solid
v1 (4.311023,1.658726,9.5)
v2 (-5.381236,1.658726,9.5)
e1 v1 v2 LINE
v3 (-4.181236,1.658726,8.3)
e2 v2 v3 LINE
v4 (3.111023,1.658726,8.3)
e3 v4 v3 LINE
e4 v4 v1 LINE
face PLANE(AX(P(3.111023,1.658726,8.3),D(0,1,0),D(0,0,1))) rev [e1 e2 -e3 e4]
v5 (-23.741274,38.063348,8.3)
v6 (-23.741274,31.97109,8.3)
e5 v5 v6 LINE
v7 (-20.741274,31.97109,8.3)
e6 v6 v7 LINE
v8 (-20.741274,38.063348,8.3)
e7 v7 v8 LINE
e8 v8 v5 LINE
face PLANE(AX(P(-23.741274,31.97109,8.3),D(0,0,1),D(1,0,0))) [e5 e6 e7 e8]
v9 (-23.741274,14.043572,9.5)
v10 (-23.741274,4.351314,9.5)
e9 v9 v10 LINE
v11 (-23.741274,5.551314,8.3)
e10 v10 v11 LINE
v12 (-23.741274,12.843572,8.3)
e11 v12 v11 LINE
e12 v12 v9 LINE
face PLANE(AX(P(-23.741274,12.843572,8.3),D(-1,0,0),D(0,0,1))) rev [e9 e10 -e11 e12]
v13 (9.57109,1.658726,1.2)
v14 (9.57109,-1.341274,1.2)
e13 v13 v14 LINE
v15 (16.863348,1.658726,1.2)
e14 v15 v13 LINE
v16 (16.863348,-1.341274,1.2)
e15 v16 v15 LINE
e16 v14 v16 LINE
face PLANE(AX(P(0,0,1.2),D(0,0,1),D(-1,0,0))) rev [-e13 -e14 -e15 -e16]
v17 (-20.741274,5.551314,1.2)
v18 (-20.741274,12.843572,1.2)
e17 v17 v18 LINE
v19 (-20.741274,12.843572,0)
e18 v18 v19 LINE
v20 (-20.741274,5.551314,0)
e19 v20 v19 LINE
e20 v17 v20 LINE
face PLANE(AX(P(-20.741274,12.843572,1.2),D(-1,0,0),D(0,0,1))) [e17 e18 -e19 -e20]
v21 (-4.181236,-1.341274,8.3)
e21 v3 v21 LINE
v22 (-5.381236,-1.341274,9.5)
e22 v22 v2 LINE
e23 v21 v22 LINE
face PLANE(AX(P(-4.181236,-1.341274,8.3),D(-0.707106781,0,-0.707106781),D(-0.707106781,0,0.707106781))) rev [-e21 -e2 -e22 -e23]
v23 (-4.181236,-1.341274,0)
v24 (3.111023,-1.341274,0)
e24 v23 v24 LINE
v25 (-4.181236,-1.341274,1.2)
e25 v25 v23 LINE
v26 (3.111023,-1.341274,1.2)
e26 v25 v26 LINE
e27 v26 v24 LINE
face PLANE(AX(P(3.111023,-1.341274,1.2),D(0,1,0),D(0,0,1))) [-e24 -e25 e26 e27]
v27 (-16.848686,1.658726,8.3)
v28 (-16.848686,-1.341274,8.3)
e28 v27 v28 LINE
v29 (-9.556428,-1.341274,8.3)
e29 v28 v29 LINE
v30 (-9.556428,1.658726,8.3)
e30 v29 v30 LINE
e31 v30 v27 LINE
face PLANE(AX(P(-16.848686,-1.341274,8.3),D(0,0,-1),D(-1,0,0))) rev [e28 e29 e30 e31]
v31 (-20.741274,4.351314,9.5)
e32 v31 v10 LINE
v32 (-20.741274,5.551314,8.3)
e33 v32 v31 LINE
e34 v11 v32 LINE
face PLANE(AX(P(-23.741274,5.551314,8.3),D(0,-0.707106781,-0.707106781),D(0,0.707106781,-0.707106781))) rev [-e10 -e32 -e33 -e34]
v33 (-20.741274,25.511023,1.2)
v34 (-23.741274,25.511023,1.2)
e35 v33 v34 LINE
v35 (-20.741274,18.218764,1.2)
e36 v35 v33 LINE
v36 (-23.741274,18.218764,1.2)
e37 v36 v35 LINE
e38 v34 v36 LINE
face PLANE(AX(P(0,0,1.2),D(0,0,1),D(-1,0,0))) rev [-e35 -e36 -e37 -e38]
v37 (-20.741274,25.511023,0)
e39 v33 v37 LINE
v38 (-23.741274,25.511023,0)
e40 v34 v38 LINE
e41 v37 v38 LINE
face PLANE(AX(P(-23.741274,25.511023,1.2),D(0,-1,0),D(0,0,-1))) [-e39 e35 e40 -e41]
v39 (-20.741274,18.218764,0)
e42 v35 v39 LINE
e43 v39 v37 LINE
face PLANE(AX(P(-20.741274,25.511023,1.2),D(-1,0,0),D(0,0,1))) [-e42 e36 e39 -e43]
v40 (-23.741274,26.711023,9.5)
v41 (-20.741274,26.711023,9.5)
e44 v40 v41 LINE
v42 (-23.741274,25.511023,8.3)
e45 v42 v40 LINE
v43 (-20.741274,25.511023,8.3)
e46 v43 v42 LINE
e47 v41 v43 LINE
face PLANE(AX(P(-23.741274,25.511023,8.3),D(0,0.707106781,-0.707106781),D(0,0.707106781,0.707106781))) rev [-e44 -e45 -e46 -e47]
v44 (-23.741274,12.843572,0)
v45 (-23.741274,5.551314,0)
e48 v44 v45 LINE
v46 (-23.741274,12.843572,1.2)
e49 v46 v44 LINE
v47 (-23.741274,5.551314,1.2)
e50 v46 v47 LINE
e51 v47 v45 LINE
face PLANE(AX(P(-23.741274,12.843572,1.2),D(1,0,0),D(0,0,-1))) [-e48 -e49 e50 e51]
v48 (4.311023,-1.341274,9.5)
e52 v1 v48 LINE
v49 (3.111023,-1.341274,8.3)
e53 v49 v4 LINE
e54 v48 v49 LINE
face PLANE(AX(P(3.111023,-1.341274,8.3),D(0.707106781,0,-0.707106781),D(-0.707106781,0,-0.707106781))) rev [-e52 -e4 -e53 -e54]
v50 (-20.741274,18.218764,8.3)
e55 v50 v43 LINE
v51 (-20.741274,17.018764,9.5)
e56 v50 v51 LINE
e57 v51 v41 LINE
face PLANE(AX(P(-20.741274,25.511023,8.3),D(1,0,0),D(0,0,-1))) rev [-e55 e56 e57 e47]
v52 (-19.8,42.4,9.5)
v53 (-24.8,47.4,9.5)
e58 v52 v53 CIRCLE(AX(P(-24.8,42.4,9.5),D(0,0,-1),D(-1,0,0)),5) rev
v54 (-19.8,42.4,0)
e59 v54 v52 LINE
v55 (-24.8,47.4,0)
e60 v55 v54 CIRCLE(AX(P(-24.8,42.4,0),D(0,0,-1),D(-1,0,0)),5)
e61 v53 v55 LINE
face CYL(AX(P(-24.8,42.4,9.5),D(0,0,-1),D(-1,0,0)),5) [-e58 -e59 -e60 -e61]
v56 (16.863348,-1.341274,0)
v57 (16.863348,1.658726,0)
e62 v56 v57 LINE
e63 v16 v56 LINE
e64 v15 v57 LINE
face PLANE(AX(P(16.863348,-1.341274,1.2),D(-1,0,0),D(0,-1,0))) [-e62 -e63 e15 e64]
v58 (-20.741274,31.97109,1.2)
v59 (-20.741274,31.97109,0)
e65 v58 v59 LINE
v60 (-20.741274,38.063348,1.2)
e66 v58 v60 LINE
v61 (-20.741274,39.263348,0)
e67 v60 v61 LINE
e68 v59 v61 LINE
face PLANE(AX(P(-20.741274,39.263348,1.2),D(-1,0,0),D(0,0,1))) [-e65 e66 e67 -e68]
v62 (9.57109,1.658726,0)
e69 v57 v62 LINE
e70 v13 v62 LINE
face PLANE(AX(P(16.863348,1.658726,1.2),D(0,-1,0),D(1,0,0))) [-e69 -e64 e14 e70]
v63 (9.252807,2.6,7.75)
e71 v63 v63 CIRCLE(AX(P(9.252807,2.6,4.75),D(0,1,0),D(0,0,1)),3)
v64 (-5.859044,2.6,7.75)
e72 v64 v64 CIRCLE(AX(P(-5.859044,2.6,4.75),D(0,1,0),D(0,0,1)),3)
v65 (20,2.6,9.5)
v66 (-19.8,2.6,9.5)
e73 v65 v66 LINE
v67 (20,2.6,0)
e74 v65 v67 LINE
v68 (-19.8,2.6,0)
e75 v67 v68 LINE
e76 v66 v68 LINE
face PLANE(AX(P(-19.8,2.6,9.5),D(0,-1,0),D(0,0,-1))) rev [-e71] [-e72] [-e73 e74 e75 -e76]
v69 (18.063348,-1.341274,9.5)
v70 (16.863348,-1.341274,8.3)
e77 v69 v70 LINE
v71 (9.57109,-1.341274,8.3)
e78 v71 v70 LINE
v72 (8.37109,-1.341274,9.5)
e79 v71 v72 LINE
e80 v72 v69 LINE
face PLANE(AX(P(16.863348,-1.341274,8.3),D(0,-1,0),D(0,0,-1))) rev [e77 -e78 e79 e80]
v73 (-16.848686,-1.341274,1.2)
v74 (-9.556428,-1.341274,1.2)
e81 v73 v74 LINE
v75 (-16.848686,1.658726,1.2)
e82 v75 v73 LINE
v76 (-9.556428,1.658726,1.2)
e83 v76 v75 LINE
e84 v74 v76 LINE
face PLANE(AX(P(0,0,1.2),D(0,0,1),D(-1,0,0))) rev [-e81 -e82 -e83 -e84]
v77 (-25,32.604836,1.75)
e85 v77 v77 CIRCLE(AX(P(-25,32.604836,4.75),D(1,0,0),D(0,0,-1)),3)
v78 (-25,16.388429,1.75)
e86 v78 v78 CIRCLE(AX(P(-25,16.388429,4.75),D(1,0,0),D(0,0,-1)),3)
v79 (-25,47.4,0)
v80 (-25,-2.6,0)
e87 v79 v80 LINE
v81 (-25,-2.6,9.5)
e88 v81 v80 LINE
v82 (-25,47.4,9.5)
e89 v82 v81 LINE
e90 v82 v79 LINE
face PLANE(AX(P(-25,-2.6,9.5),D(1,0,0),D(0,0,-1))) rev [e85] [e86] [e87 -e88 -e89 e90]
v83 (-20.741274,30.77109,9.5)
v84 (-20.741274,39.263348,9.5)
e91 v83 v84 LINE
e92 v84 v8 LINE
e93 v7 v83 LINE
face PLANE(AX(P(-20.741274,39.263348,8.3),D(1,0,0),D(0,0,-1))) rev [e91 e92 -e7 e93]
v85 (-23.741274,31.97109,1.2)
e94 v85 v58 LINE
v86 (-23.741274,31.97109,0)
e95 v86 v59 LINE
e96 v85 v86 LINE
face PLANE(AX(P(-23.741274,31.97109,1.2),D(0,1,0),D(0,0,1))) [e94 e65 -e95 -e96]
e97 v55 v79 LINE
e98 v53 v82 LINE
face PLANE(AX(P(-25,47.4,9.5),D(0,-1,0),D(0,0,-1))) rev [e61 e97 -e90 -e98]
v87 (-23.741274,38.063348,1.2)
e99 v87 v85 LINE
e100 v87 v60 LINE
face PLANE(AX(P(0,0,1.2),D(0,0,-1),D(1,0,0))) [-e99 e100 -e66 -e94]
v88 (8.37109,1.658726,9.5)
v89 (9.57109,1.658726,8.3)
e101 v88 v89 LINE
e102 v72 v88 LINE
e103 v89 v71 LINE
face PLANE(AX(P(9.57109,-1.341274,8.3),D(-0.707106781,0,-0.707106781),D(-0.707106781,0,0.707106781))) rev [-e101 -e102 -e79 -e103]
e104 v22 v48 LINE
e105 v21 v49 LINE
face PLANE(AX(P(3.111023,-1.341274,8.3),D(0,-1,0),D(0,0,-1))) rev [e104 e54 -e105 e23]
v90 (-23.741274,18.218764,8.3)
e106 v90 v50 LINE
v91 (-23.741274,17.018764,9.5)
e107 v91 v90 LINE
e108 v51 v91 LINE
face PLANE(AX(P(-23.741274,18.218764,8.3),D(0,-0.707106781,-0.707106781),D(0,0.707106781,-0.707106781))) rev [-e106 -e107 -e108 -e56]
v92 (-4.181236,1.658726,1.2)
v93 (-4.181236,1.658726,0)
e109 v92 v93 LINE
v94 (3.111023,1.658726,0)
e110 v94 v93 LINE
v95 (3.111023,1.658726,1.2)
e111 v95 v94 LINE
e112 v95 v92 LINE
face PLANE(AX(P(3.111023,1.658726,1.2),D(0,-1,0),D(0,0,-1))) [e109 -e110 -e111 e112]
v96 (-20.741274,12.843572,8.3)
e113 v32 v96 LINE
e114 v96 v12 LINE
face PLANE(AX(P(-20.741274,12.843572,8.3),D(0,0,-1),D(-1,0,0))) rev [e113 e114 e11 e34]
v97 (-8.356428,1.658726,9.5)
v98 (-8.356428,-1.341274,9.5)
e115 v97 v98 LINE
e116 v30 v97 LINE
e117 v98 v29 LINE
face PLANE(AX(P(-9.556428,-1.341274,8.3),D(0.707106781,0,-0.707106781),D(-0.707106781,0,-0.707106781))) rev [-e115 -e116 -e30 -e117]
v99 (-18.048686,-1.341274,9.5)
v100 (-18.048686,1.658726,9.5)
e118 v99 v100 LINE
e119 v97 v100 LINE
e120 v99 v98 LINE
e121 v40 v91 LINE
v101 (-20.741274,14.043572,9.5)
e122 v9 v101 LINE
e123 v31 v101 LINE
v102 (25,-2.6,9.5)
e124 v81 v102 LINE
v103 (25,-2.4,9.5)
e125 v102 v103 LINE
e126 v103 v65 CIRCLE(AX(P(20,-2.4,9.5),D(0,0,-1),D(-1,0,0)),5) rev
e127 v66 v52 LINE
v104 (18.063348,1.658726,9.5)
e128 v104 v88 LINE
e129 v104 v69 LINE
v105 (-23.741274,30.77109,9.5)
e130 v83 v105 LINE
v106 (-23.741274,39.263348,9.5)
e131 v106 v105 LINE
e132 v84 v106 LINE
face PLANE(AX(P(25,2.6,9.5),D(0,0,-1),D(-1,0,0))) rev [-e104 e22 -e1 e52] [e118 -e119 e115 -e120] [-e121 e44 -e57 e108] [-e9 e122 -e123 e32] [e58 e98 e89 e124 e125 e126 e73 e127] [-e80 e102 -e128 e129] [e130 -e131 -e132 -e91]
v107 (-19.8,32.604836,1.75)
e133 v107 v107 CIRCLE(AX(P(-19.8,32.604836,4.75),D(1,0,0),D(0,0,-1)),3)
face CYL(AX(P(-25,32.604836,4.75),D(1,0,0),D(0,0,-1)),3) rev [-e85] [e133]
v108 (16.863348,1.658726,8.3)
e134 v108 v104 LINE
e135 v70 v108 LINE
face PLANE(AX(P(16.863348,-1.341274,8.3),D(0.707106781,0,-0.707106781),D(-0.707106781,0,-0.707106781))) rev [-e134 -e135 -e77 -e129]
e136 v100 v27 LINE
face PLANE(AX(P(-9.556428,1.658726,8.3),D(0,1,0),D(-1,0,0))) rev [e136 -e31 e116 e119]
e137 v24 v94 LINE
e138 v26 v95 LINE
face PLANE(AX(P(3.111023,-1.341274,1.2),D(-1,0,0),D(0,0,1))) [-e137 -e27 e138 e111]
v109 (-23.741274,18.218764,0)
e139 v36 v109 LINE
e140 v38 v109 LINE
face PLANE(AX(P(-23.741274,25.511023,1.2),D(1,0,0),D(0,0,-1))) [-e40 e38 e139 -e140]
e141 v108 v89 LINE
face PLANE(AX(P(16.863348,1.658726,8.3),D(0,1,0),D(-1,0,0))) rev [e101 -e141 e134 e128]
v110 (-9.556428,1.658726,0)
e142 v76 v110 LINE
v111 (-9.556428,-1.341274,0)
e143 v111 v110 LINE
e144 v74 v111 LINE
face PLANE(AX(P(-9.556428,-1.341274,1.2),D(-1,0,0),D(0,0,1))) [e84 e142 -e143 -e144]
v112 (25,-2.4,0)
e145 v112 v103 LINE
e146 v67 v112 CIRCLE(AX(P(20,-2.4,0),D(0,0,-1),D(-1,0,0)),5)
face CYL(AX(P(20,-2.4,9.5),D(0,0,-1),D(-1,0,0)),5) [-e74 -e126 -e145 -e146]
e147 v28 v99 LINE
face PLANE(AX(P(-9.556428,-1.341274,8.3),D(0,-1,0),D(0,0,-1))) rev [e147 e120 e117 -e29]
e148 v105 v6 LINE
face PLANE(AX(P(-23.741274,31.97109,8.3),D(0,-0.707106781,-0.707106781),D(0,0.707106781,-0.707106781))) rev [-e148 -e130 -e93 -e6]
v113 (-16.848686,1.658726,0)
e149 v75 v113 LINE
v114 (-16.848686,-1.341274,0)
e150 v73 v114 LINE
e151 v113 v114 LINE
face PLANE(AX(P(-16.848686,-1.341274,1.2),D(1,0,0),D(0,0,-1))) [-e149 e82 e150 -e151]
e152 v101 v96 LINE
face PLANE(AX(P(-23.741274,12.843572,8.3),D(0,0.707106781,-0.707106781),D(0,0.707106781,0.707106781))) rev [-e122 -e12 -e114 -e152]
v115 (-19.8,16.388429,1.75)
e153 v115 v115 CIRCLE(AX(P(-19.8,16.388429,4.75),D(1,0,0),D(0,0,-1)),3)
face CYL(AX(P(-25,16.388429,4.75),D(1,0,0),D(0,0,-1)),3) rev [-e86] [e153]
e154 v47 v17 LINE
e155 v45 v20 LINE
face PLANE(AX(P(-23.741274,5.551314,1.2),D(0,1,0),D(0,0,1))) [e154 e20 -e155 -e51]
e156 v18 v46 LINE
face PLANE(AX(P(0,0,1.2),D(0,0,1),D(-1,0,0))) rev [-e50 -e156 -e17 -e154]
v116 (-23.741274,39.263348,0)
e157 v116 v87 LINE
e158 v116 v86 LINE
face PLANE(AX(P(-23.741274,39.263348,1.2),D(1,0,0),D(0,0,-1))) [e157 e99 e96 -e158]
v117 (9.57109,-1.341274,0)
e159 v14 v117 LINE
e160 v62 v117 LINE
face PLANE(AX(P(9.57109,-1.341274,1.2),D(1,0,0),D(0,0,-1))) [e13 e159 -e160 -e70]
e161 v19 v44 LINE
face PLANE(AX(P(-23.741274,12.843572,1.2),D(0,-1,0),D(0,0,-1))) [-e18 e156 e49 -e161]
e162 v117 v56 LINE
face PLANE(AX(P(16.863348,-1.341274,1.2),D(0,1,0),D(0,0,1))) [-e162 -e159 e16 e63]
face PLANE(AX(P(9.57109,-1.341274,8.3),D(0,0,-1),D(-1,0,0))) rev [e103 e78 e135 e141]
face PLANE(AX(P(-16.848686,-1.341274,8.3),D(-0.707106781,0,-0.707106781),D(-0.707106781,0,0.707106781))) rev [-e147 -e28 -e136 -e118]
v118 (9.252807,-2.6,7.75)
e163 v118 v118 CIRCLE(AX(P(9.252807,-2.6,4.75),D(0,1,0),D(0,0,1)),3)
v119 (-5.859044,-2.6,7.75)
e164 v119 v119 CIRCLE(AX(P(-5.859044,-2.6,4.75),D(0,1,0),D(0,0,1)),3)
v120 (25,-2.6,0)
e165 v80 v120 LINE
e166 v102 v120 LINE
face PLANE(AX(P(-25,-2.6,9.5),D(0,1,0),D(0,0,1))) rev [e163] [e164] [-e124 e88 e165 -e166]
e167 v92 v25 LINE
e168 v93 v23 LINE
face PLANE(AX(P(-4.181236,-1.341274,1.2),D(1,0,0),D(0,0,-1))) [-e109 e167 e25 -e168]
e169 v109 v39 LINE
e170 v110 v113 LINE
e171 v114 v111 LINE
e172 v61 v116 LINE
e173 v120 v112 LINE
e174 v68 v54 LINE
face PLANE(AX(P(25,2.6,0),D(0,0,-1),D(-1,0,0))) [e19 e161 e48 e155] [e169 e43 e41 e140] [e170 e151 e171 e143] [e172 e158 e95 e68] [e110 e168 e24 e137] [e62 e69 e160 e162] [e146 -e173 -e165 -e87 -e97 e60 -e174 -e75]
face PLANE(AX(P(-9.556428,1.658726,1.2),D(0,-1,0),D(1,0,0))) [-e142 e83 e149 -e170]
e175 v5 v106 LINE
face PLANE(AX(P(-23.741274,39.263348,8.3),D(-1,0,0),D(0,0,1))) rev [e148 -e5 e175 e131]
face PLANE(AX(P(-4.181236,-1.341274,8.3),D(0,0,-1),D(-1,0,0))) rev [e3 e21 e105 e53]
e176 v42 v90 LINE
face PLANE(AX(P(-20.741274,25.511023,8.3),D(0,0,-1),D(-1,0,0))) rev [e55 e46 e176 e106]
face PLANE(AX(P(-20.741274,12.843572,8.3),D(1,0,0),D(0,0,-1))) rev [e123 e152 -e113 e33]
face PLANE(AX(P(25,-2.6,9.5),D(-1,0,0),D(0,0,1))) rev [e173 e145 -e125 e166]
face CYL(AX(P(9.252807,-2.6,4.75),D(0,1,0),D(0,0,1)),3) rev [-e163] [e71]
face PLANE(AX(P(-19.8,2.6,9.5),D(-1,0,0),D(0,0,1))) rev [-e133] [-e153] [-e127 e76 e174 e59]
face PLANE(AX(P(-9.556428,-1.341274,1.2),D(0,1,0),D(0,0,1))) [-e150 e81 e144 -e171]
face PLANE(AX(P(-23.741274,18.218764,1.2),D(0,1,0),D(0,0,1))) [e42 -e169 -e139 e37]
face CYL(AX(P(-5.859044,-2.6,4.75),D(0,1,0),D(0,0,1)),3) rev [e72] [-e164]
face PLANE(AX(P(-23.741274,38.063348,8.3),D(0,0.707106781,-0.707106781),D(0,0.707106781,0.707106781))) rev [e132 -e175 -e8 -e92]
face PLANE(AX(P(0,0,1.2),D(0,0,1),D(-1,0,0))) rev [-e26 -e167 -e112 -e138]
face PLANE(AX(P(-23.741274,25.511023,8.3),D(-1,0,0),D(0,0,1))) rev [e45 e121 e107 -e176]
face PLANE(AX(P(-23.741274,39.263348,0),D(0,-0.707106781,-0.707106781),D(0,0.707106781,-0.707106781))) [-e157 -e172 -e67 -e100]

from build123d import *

# Parameters (mm, degrees)
EXTRUDE_1_DEPTH      = 9.5
SKETCH_2_R           = 3
CUT_EXTRUDE_1_DEPTH  = 66.909407523
SKETCH_4_R           = 3
CUT_EXTRUDE_2_DEPTH  = 53.175568995
FILLET_1_R           = 5
SKETCH_5_W           = 3
SKETCH_5_H           = 7.292258694
SKETCH_5_H_2         = 7.292258695
SKETCH_5_W_2         = 7.292258695
SKETCH_5_H_3         = 3
SKETCH_5_W_3         = 7.292258694
CUT_EXTRUDE_3_DEPTH  = 1.2
CHAMFER_1_SIZE       = 1.2
CHAMFER_2_SIZE       = 1.2
MIRROR_START         = -23.741274046
MIRROR_1_OUTLINE_W   = 7.292258694
MIRROR_1_OUTLINE_H   = 1.2
MIRROR_1_OUTLINE_W_2 = 7.292258695
MIRROR_1_DEPTH       = 3
MIRROR_START_2       = -16.84868645
MIRROR_1_2_OUTLINE_W = 3
MIRROR_1_2_OUTLINE_H = 1.2
MIRROR_1_2_DEPTH     = 7.292258695
MIRROR_START_3       = -4.181235969
MIRROR_1_3_OUTLINE_W = 3
MIRROR_1_3_OUTLINE_H = 1.2
MIRROR_1_3_DEPTH     = 7.292258694
MIRROR_START_4       = 9.571089537
MIRROR_1_4_OUTLINE_W = 3
MIRROR_1_4_OUTLINE_H = 1.2
MIRROR_1_4_DEPTH     = 7.292258694


# Read off the part's stored shape, not the designer's step: 镜向1
with BuildPart() as part:
    # 草图1 → 凸台-拉伸1 (new body)
    with BuildSketch(Plane.XY):
        Polygon((-19.8, 2.6), (-19.8, 47.4), (-25, 47.4), (-25, -2.6), (25, -2.6), (25, 2.6), align=None)
    extrude(amount=EXTRUDE_1_DEPTH)

    # 草图2 → 切除-拉伸1 (cut, through all)
    with BuildSketch(Plane(origin=(-19.8, 0, 0), x_dir=(0, 0, -1), z_dir=(1, 0, 0))):
        with Locations((-4.75, 32.604835918)):
            Circle(SKETCH_2_R)
        with Locations((-4.75, 16.388429447)):
            Circle(SKETCH_2_R)
    extrude(amount=-CUT_EXTRUDE_1_DEPTH, mode=Mode.SUBTRACT)

    # 草图4 → 切除-拉伸2 (cut, through all)
    with BuildSketch(Plane(origin=(0, 2.6, 0), x_dir=(1, 0, 0), z_dir=(0, 1, 0))):
        with Locations(Location((9.252806551, -4.75, 0), (0, 0, 270))):
            Circle(SKETCH_4_R)
        with Locations(Location((-5.859043595, -4.75, 0), (0, 0, 270))):
            Circle(SKETCH_4_R)
    extrude(amount=-CUT_EXTRUDE_2_DEPTH, mode=Mode.SUBTRACT)

    # 圆角1
    fillet_1_edges = [part.edges().sort_by_distance(p)[0] for p in [
        (-19.8, 47.4, 4.75),
        (25, 2.6, 4.75),
    ]]
    fillet(fillet_1_edges, radius=FILLET_1_R)

    # 草图5 → 切除-拉伸3 (cut)
    with BuildSketch(Plane.XY.offset(9.5)):
        with Locations((-22.241274046, 21.864893378)):
            Rectangle(SKETCH_5_W, SKETCH_5_H)
        with Locations((-22.241274046, 35.617218884)):
            Rectangle(SKETCH_5_W, SKETCH_5_H)
        with Locations((-22.241274046, 9.197442898)):
            Rectangle(SKETCH_5_W, SKETCH_5_H_2)
        with Locations((-13.202557103, 0.158725954)):
            Rectangle(SKETCH_5_W_2, SKETCH_5_H_3)
        with Locations((-0.535106622, 0.158725954)):
            Rectangle(SKETCH_5_W_3, SKETCH_5_H_3)
        with Locations((13.217218884, 0.158725954)):
            Rectangle(SKETCH_5_W_3, SKETCH_5_H_3)
    extrude(amount=-CUT_EXTRUDE_3_DEPTH, mode=Mode.SUBTRACT)

    # 倒角1
    chamfer_1_edges = [part.edges().sort_by_distance(p)[0] for p in [
        (-22.241274046, 5.55131355, 9.5),
        (-22.241274046, 12.843572245, 9.5),
        (-22.241274046, 18.218764031, 9.5),
        (-22.241274046, 25.511022725, 9.5),
        (-22.241274046, 39.263348231, 8.3),
        (-22.241274046, 31.971089537, 9.5),
    ]]
    chamfer(chamfer_1_edges, length=CHAMFER_1_SIZE - 0.0001)  # a hair under: the kernel refuses the full size

    # 倒角2
    chamfer_2_edges = [part.edges().sort_by_distance(p)[0] for p in [
        (16.863348231, 0.158725954, 9.5),
        (9.571089537, 0.158725954, 9.5),
        (3.111022725, 0.158725954, 9.5),
        (-4.181235969, 0.158725954, 9.5),
        (-9.556427755, 0.158725954, 9.5),
        (-16.84868645, 0.158725954, 9.5),
    ]]
    chamfer(chamfer_2_edges, length=CHAMFER_2_SIZE - 0.0001)  # a hair under: the kernel refuses the full size

    # 镜向1 outline → 镜向1 (cut)
    with BuildSketch(Plane.YZ.offset(MIRROR_START)):
        Polygon((31.971089537, 1.2), (31.971089537, 0), (39.263348231, 0), (38.063348231, 1.2), align=None)
        with Locations((21.864893378, 0.6)):
            Rectangle(MIRROR_1_OUTLINE_W, MIRROR_1_OUTLINE_H)
        with Locations((9.197442898, 0.6)):
            Rectangle(MIRROR_1_OUTLINE_W_2, MIRROR_1_OUTLINE_H)
    extrude(amount=MIRROR_1_DEPTH, mode=Mode.SUBTRACT)

    # Mirror 1 2 outline → Mirror 1 2 (cut)
    with BuildSketch(Plane.YZ.offset(MIRROR_START_2)):
        with Locations((0.158725954, 0.6)):
            Rectangle(MIRROR_1_2_OUTLINE_W, MIRROR_1_2_OUTLINE_H)
    extrude(amount=MIRROR_1_2_DEPTH, mode=Mode.SUBTRACT)

    # Mirror 1 3 outline → Mirror 1 3 (cut)
    with BuildSketch(Plane.YZ.offset(MIRROR_START_3)):
        with Locations((0.158725954, 0.6)):
            Rectangle(MIRROR_1_3_OUTLINE_W, MIRROR_1_3_OUTLINE_H)
    extrude(amount=MIRROR_1_3_DEPTH, mode=Mode.SUBTRACT)

    # Mirror 1 4 outline → Mirror 1 4 (cut)
    with BuildSketch(Plane.YZ.offset(MIRROR_START_4)):
        with Locations((0.158725954, 0.6)):
            Rectangle(MIRROR_1_4_OUTLINE_W, MIRROR_1_4_OUTLINE_H)
    extrude(amount=MIRROR_1_4_DEPTH, mode=Mode.SUBTRACT)


solid = part.part
